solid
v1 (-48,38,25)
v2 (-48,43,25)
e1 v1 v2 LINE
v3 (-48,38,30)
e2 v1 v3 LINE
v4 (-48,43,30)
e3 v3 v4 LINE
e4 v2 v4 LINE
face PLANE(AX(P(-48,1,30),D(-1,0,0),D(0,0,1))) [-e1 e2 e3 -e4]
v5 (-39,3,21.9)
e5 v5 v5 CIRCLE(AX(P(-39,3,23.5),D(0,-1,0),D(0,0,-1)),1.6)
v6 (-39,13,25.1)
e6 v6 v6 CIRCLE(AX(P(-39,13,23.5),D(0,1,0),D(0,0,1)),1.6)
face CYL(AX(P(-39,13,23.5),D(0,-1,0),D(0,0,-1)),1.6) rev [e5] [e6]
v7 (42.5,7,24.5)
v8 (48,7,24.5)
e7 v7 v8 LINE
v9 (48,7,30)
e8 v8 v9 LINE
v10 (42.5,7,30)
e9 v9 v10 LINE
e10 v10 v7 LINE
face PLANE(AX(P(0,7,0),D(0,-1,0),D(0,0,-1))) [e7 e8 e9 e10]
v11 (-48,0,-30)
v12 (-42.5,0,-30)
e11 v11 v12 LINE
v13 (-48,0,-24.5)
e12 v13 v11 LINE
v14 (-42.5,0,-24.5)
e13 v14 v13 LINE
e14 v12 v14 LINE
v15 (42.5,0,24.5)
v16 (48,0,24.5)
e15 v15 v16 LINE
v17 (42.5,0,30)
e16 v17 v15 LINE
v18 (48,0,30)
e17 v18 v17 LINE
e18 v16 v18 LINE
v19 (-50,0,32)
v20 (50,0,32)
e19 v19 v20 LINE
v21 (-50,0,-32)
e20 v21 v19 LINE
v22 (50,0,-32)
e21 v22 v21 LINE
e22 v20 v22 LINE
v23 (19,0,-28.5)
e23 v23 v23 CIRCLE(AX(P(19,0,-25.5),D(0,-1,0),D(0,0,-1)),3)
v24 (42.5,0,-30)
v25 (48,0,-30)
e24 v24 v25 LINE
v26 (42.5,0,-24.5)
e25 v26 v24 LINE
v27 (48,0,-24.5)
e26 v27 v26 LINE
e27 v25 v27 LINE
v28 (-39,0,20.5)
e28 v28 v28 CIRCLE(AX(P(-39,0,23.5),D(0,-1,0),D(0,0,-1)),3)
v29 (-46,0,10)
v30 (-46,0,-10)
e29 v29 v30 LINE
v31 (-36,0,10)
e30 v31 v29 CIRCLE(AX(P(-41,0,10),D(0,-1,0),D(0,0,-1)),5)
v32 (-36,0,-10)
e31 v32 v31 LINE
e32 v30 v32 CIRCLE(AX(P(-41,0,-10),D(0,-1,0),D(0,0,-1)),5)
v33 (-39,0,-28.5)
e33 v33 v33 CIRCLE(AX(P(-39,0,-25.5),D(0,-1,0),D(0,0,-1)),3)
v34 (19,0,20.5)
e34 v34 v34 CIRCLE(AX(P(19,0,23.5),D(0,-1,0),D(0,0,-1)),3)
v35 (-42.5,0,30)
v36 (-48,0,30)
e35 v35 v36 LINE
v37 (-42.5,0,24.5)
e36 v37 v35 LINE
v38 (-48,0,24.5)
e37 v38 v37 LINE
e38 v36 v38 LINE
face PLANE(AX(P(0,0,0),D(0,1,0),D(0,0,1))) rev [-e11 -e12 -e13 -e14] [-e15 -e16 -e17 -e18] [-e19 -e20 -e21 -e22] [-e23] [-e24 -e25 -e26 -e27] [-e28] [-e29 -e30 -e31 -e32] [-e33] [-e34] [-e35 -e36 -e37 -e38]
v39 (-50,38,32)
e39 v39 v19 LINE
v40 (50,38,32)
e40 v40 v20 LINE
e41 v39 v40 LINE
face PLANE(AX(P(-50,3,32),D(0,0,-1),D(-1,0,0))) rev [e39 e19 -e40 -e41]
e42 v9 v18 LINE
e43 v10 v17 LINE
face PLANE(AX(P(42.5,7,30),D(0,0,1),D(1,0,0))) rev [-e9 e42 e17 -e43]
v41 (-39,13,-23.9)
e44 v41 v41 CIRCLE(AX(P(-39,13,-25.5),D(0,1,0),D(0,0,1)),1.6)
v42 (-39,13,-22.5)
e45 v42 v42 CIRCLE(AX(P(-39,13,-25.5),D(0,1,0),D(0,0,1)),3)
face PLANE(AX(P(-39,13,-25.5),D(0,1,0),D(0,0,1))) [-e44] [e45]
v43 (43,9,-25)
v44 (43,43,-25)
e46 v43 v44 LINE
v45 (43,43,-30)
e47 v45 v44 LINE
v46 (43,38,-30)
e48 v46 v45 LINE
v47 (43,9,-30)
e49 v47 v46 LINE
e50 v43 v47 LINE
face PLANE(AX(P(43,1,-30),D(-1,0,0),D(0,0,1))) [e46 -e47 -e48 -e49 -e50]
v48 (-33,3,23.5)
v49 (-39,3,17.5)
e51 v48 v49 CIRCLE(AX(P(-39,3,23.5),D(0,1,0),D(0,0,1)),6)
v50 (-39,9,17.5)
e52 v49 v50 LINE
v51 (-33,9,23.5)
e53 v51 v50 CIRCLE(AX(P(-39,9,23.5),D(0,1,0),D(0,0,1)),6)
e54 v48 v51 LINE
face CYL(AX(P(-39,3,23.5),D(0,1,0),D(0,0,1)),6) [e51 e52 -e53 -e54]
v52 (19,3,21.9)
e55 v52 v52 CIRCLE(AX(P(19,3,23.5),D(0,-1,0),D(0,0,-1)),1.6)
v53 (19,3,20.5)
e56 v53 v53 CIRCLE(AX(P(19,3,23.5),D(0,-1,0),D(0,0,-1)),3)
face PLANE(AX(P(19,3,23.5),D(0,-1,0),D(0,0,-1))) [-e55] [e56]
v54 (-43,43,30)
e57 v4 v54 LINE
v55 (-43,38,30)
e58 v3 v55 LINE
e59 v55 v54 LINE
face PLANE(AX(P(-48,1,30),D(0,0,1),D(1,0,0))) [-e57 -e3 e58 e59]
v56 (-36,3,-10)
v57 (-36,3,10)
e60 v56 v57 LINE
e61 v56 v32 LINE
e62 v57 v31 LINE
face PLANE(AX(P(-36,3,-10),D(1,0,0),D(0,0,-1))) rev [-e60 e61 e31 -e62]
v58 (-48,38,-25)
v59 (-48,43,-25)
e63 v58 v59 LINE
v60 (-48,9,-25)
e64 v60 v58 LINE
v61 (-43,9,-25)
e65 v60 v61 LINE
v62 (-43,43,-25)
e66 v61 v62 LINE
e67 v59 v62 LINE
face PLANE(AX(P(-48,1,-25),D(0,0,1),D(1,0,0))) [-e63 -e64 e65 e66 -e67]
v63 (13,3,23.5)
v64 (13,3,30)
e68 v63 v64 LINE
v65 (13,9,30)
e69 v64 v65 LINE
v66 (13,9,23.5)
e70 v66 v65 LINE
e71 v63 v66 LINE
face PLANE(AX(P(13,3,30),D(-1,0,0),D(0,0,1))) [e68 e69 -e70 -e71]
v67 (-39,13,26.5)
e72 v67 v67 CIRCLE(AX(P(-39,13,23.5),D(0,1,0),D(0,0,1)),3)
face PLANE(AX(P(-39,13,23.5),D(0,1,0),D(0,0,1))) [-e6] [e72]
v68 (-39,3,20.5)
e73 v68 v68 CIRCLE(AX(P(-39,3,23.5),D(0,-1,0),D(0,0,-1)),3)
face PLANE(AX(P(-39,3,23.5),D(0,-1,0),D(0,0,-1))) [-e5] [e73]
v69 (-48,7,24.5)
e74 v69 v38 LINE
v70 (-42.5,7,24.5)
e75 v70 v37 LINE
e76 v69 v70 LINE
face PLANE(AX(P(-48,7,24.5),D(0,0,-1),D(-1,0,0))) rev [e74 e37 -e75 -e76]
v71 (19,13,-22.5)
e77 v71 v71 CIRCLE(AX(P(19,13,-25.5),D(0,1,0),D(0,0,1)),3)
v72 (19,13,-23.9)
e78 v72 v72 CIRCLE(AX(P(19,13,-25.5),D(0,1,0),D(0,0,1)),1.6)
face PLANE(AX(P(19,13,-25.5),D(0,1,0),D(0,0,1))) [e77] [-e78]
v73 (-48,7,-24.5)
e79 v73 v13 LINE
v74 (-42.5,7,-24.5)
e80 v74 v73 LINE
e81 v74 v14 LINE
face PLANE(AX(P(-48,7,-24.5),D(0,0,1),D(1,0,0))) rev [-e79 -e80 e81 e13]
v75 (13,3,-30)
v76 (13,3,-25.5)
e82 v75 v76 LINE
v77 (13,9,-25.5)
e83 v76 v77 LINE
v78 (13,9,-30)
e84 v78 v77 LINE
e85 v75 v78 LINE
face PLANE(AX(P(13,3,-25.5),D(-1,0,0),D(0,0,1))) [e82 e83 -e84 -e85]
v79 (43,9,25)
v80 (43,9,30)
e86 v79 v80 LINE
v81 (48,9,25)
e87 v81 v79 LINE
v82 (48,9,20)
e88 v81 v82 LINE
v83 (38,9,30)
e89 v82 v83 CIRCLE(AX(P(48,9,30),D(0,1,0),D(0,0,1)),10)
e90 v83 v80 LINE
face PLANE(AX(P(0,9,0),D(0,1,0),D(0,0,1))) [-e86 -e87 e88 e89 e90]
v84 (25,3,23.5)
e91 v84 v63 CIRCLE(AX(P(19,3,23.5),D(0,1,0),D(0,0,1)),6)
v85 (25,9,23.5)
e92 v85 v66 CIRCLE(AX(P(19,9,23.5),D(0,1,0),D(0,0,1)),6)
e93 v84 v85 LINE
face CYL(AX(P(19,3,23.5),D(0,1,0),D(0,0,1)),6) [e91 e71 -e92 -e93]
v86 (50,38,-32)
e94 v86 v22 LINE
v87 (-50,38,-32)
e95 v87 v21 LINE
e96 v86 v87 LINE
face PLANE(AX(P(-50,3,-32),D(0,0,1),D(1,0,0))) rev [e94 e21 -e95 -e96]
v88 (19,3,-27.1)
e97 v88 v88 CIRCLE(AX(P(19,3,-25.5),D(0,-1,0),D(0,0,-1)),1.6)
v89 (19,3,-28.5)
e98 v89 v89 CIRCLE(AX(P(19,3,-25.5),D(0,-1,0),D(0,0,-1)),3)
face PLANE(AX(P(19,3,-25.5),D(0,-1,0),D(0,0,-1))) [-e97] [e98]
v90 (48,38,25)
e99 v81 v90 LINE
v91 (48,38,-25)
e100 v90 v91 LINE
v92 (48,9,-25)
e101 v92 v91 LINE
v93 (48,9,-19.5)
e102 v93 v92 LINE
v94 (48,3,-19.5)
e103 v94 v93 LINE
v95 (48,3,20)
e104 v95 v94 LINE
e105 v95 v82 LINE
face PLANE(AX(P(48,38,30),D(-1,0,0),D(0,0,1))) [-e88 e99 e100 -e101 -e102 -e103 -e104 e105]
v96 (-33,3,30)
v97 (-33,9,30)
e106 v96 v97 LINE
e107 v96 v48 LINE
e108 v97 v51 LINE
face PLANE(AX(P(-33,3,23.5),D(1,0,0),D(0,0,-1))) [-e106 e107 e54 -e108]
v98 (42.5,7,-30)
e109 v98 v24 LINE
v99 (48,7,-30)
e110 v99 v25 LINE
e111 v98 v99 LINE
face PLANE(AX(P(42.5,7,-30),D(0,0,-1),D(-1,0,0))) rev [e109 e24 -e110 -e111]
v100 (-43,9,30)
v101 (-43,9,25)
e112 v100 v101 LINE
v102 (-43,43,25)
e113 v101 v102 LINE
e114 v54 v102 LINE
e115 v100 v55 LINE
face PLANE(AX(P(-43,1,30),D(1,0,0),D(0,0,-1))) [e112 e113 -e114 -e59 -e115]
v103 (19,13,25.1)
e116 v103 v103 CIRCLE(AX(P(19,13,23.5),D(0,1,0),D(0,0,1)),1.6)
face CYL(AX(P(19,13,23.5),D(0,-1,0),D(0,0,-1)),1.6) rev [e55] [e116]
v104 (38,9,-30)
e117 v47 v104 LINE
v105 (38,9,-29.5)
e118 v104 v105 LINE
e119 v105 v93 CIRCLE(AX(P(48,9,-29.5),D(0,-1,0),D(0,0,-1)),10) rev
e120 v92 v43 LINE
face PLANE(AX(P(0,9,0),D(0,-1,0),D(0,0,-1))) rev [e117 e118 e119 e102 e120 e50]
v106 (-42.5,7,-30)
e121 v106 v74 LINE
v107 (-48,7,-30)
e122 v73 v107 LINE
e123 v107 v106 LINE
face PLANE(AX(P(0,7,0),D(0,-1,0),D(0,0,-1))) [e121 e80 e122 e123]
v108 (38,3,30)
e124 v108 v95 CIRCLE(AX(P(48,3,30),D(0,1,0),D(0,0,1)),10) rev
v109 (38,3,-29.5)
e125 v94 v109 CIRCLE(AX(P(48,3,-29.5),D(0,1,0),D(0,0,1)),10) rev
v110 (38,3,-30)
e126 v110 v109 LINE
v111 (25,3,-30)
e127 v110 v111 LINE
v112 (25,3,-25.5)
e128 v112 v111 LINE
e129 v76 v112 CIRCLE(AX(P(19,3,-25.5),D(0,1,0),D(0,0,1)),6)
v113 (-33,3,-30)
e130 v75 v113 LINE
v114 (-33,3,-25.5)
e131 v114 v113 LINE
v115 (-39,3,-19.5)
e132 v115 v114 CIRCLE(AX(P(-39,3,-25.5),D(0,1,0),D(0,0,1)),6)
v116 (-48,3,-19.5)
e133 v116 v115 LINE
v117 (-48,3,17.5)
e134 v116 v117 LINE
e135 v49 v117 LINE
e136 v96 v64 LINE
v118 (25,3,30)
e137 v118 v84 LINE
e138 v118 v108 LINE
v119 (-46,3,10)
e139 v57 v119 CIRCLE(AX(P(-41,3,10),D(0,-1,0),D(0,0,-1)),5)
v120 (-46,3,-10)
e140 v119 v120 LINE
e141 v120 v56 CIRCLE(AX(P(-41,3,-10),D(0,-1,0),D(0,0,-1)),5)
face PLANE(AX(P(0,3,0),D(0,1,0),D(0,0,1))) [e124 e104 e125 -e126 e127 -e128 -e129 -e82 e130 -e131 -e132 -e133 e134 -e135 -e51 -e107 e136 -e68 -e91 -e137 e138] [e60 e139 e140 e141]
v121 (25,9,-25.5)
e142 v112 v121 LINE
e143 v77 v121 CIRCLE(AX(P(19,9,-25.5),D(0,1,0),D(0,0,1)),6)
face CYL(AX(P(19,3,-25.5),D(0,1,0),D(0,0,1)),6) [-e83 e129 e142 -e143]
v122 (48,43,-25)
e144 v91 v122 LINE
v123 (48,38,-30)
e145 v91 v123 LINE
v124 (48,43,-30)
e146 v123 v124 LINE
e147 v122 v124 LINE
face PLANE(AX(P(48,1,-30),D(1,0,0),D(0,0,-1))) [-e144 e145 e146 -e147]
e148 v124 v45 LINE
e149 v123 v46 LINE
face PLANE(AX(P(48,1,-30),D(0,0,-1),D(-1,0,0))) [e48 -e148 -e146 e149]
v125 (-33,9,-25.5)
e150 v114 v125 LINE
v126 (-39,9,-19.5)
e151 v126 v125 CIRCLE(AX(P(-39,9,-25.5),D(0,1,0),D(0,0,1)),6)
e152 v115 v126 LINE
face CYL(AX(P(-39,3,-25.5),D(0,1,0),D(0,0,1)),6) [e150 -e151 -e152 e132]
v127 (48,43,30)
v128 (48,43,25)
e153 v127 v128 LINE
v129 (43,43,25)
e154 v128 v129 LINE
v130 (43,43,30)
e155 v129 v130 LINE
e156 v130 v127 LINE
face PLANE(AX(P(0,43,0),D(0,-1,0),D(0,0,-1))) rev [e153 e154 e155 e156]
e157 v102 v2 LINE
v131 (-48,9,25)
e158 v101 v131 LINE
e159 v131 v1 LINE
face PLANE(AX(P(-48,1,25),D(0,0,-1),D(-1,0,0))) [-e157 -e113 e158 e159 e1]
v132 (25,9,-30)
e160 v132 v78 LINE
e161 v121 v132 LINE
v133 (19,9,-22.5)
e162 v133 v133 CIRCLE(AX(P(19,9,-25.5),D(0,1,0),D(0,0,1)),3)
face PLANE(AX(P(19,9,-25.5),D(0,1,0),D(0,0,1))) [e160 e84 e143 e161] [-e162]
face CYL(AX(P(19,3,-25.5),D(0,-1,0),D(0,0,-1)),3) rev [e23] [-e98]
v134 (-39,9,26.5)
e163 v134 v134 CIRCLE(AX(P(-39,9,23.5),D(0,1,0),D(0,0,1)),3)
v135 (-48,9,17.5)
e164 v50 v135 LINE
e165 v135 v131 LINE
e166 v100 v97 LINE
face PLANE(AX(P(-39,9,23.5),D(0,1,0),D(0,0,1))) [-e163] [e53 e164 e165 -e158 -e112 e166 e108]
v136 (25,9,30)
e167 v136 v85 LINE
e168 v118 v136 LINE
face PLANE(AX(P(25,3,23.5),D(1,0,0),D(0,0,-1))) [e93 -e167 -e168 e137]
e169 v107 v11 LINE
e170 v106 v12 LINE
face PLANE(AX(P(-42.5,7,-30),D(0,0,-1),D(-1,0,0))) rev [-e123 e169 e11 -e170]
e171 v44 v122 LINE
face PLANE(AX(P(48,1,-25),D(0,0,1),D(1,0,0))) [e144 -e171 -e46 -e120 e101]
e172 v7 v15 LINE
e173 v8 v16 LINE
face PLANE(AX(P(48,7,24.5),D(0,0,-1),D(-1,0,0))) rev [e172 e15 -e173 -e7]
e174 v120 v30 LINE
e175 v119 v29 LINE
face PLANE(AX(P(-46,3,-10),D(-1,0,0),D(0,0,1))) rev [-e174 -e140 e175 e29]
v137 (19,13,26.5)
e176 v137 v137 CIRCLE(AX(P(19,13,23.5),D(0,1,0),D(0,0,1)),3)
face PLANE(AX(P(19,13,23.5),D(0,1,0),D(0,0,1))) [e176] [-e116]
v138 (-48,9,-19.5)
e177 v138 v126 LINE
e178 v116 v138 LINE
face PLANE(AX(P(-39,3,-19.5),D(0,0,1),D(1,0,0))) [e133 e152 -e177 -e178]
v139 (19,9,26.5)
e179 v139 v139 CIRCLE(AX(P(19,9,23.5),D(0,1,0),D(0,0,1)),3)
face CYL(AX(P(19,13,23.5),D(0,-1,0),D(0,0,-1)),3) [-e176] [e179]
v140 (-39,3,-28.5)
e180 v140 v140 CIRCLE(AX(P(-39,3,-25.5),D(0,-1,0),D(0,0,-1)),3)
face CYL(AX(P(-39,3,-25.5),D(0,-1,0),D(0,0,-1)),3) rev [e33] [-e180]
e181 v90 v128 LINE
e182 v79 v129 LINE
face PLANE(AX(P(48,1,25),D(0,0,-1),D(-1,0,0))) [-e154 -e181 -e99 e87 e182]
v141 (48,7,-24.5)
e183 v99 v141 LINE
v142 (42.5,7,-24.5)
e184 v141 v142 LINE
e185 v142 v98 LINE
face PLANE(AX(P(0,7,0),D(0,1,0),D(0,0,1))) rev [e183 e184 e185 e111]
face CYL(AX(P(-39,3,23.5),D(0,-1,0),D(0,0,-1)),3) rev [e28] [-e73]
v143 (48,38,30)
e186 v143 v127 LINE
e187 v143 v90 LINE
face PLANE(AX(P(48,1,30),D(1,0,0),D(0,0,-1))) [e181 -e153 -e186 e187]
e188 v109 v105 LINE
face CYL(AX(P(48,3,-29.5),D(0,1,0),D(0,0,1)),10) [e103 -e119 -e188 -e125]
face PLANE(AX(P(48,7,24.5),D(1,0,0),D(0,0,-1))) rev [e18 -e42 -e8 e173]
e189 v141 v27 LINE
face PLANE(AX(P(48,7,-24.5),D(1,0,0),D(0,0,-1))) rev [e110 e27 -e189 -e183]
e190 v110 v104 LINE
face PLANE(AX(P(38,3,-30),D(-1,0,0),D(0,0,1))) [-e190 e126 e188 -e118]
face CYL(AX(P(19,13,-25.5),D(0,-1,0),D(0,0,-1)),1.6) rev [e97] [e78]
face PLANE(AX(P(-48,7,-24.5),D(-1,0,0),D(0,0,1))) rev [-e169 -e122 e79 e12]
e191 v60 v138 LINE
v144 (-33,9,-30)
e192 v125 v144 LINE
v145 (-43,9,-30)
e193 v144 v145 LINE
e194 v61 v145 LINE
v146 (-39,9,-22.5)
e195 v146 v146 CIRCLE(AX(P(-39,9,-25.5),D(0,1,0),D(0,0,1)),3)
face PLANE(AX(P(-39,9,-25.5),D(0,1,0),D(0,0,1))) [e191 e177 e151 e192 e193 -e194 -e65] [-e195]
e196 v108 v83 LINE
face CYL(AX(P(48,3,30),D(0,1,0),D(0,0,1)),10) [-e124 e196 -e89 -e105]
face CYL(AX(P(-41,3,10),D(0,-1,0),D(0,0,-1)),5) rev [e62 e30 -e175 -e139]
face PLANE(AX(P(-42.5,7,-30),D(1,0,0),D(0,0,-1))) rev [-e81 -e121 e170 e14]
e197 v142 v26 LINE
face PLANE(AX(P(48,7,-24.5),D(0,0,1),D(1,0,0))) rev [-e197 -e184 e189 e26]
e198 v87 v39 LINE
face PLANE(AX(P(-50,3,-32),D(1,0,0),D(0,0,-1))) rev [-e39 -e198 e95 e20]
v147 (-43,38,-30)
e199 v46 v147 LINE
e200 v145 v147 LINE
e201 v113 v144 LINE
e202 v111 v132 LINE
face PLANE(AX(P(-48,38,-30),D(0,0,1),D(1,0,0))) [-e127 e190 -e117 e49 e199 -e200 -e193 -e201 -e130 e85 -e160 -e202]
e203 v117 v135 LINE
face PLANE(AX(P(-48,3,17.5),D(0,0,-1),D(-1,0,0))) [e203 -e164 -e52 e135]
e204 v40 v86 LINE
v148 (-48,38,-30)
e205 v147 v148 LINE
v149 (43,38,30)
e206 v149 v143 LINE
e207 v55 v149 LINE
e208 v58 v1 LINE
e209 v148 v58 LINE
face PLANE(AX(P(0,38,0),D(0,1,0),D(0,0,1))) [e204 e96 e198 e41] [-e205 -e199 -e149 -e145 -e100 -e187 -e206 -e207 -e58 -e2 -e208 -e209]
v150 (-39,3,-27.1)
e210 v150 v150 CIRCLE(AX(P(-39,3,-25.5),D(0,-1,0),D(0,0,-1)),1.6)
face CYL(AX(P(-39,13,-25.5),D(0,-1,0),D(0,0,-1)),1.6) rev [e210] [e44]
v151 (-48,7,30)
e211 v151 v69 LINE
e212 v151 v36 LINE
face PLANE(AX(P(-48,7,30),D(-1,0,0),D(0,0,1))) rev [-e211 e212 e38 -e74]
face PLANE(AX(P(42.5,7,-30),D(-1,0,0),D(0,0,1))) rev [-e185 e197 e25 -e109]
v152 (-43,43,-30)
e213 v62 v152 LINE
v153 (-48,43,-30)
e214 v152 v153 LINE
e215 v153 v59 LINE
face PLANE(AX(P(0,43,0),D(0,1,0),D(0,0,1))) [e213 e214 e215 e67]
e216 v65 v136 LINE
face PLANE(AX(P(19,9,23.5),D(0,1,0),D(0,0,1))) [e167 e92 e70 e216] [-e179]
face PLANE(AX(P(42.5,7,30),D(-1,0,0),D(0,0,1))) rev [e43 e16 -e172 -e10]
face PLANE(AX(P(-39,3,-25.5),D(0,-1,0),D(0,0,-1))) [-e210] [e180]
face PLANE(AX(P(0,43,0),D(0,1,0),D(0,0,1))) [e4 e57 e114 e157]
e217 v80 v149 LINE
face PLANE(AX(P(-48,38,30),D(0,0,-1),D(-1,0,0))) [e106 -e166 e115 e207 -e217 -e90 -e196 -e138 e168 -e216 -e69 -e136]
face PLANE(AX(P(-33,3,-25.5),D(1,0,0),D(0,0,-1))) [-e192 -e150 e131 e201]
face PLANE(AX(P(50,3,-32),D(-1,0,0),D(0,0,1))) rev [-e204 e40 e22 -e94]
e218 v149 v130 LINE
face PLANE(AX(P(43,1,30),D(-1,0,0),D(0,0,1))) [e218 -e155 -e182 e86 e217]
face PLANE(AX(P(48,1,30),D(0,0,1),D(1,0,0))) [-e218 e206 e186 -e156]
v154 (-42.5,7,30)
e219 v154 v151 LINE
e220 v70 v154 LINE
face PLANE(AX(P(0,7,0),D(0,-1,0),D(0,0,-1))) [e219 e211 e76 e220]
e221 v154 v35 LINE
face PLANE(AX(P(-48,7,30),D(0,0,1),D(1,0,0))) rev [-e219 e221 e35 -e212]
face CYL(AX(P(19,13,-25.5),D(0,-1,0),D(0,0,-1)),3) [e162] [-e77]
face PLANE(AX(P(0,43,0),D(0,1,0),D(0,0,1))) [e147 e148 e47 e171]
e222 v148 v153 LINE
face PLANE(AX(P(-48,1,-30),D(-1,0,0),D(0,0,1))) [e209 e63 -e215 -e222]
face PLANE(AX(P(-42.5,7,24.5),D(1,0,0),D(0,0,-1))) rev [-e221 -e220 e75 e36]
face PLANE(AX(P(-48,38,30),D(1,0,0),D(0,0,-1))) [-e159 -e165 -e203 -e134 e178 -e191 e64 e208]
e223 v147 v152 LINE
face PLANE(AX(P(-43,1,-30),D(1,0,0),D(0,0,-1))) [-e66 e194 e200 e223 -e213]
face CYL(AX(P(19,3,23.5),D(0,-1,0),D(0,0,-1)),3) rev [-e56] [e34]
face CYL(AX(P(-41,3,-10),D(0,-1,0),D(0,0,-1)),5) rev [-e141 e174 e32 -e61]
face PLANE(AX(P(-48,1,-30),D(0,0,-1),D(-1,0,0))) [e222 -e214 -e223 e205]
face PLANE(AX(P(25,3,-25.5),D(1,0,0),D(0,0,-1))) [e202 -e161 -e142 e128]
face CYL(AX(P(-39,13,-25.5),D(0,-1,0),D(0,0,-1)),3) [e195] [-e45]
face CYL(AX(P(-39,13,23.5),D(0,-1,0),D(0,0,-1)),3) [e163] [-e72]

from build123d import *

# Parameters (mm, degrees)
SKETCH1_W                = 100
SKETCH1_H                = 64
BOSS_EXTRUDE1_DEPTH      = 3
SKETCH2_W                = 100
SKETCH2_H                = 64
SKETCH2_W_2              = 96
SKETCH2_H_2              = 60
BOSS_EXTRUDE2_DEPTH      = 35
SKETCH6_R                = 3
SKETCH6_R_2              = 1.6
BOSS_EXTRUDE3_DEPTH      = 10
SKETCH7_R                = 1.5
CUT_EXTRUDE2_DEPTH       = 69.912988616
BOSS_EXTRUDE8_START      = -10
SKETCH10_R               = 3
SKETCH10_W               = 10
SKETCH10_H               = 10.5
SKETCH10_H_2             = 10
BOSS_EXTRUDE8_DEPTH      = 6
SKETCH11_R               = 3
CUT_EXTRUDE4_DEPTH       = 3
BOSS_EXTRUDE9_DEPTH      = 5
BOSS_EXTRUDE9_DEPTH_BACK = 37
SKETCH12_W               = 5
SKETCH12_H               = 5
SKETCH13_W               = 5.5
SKETCH13_H               = 5.5
CUT_EXTRUDE5_DEPTH       = 7
FILLET1_R                = 10


with BuildPart() as part:
    # Sketch1 → Boss-Extrude1 (new body)
    with BuildSketch(Plane(origin=(0, 0, 0), x_dir=(1, 0, 0), z_dir=(0, 1, 0))):
        Rectangle(SKETCH1_W, SKETCH1_H)
    extrude(amount=BOSS_EXTRUDE1_DEPTH)

    # Sketch2 → Boss-Extrude2 (add)
    with BuildSketch(Plane(origin=(0, 3, 0), x_dir=(1, 0, 0), z_dir=(0, 1, 0))):
        Rectangle(SKETCH2_W, SKETCH2_H)
        Rectangle(SKETCH2_W_2, SKETCH2_H_2, mode=Mode.SUBTRACT)
    extrude(amount=BOSS_EXTRUDE2_DEPTH)

    # Sketch6 → Boss-Extrude3 (add)
    # profile 1 of 4: a face of its own
    with BuildSketch(Plane(origin=(0, 3, 0), x_dir=(1, 0, 0), z_dir=(0, 1, 0))):
        with Locations(Location((-39, 25.5, 0), (0, 0, 270))):
            Circle(SKETCH6_R)
        with Locations(Location((-39, 25.5, 0), (0, 0, 270))):
            Circle(SKETCH6_R_2, mode=Mode.SUBTRACT)
    # profile 2 of 4: a face of its own
    with BuildSketch(Plane(origin=(0, 3, 0), x_dir=(1, 0, 0), z_dir=(0, 1, 0))):
        with Locations(Location((19, 25.5, 0), (0, 0, 270))):
            Circle(SKETCH6_R)
        with Locations(Location((19, 25.5, 0), (0, 0, 270))):
            Circle(SKETCH6_R_2, mode=Mode.SUBTRACT)
    # profile 3 of 4: a face of its own
    with BuildSketch(Plane(origin=(0, 3, 0), x_dir=(1, 0, 0), z_dir=(0, 1, 0))):
        with Locations(Location((-39, -23.5, 0), (0, 0, 270))):
            Circle(SKETCH6_R)
        with Locations(Location((-39, -23.5, 0), (0, 0, 270))):
            Circle(SKETCH6_R_2, mode=Mode.SUBTRACT)
    # profile 4 of 4: a face of its own
    with BuildSketch(Plane(origin=(0, 3, 0), x_dir=(1, 0, 0), z_dir=(0, 1, 0))):
        with Locations(Location((19, -23.5, 0), (0, 0, 270))):
            Circle(SKETCH6_R)
        with Locations(Location((19, -23.5, 0), (0, 0, 270))):
            Circle(SKETCH6_R_2, mode=Mode.SUBTRACT)
    extrude(amount=BOSS_EXTRUDE3_DEPTH)

    # Sketch7 → Cut-Extrude2 (cut, through all)
    with BuildSketch(Plane(origin=(0, 3, 0), x_dir=(1, 0, 0), z_dir=(0, 1, 0))):
        with Locations(Location((-39, 25.5, 0), (0, 0, 270))):
            Circle(SKETCH7_R)
        with Locations(Location((19, 25.5, 0), (0, 0, 270))):
            Circle(SKETCH7_R)
        with Locations(Location((19, -23.5, 0), (0, 0, 270))):
            Circle(SKETCH7_R)
        with Locations(Location((-39, -23.5, 0), (0, 0, 270))):
            Circle(SKETCH7_R)
    extrude(amount=-CUT_EXTRUDE2_DEPTH, mode=Mode.SUBTRACT)

    # Sketch10 → Boss-Extrude8 (add)
    # profile 1 of 6: a face of its own
    with BuildSketch(Plane(origin=(0, 13, 0), x_dir=(1, 0, 0), z_dir=(0, 1, 0)).offset(BOSS_EXTRUDE8_START)):
        with BuildLine():
            Line((-33, 25.5), (-33, 30))
            Line((-33, 30), (-48, 30))
            Line((-48, 30), (-48, 19.5))
            Line((-48, 19.5), (-39, 19.5))
            ThreePointArc((-39, 19.5), (-34.757359313, 21.257359313), (-33, 25.5))
        make_face()
        with Locations(Location((-39, 25.5, 0), (0, 0, 270))):
            Circle(SKETCH10_R, mode=Mode.SUBTRACT)
    # profile 2 of 6: a face of its own
    with BuildSketch(Plane(origin=(0, 13, 0), x_dir=(1, 0, 0), z_dir=(0, 1, 0)).offset(BOSS_EXTRUDE8_START)):
        with BuildLine():
            Line((25, 25.5), (25, 30))
            Line((25, 30), (13, 30))
            Line((13, 30), (13, 25.5))
            ThreePointArc((13, 25.5), (19, 19.5), (25, 25.5))
        make_face()
        with Locations(Location((19, 25.5, 0), (0, 0, 270))):
            Circle(SKETCH10_R, mode=Mode.SUBTRACT)
    # profile 3 of 6: a face of its own
    with BuildSketch(Plane(origin=(0, 13, 0), x_dir=(1, 0, 0), z_dir=(0, 1, 0)).offset(BOSS_EXTRUDE8_START)):
        with BuildLine():
            Line((25, -23.5), (25, -30))
            Line((25, -30), (13, -30))
            Line((13, -30), (13, -23.5))
            ThreePointArc((13, -23.5), (19, -17.5), (25, -23.5))
        make_face()
        with Locations(Location((19, -23.5, 0), (0, 0, 270))):
            Circle(SKETCH10_R, mode=Mode.SUBTRACT)
    # profile 4 of 6: a face of its own
    with BuildSketch(Plane(origin=(0, 13, 0), x_dir=(1, 0, 0), z_dir=(0, 1, 0)).offset(BOSS_EXTRUDE8_START)):
        with BuildLine():
            Line((-33, -23.5), (-33, -30))
            Line((-33, -30), (-48, -30))
            Line((-48, -30), (-48, -17.5))
            Line((-48, -17.5), (-39, -17.5))
            ThreePointArc((-39, -17.5), (-34.757359313, -19.257359313), (-33, -23.5))
        make_face()
        with Locations(Location((-39, -23.5, 0), (0, 0, 270))):
            Circle(SKETCH10_R, mode=Mode.SUBTRACT)
    # profile 5 of 6: a face of its own
    with BuildSketch(Plane(origin=(0, 13, 0), x_dir=(1, 0, 0), z_dir=(0, 1, 0)).offset(BOSS_EXTRUDE8_START)):
        with Locations((43, 24.75)):
            Rectangle(SKETCH10_W, SKETCH10_H)
    # profile 6 of 6: a face of its own
    with BuildSketch(Plane(origin=(0, 13, 0), x_dir=(1, 0, 0), z_dir=(0, 1, 0)).offset(BOSS_EXTRUDE8_START)):
        with Locations((43, -25)):
            Rectangle(SKETCH10_W, SKETCH10_H_2)
    extrude(amount=BOSS_EXTRUDE8_DEPTH)

    # Sketch11 → Cut-Extrude4 (cut)
    with BuildSketch(Plane.XZ):
        with Locations(Location((-39, 23.5, 0), (0, 0, 90))):
            Circle(SKETCH11_R)
        with Locations(Location((19, 23.5, 0), (0, 0, 90))):
            Circle(SKETCH11_R)
        with Locations(Location((19, -25.5, 0), (0, 0, 90))):
            Circle(SKETCH11_R)
        with Locations(Location((-39, -25.5, 0), (0, 0, 90))):
            Circle(SKETCH11_R)
        with BuildLine():
            Line((-46, -10), (-46, 10))
            ThreePointArc((-46, 10), (-41, 15), (-36, 10))
            Line((-36, 10), (-36, -10))
            ThreePointArc((-36, -10), (-41, -15), (-46, -10))
        make_face()
    extrude(amount=-CUT_EXTRUDE4_DEPTH, mode=Mode.SUBTRACT)

    # Sketch12 → Boss-Extrude9 (add, two sides: drawn at the far end of the back side and taken through both)
    with BuildSketch(Plane(origin=(0, 38, 0), x_dir=(1, 0, 0), z_dir=(0, 1, 0)).offset(-BOSS_EXTRUDE9_DEPTH_BACK)):
        with Locations((-45.5, 27.5)):
            Rectangle(SKETCH12_W, SKETCH12_H)
        with Locations((45.5, 27.5)):
            Rectangle(SKETCH12_W, SKETCH12_H)
        with Locations((45.5, -27.5)):
            Rectangle(SKETCH12_W, SKETCH12_H)
        with Locations((-45.5, -27.5)):
            Rectangle(SKETCH12_W, SKETCH12_H)
    extrude(amount=BOSS_EXTRUDE9_DEPTH + BOSS_EXTRUDE9_DEPTH_BACK)

    # Sketch13 → Cut-Extrude5 (cut)
    with BuildSketch(Plane.XZ):
        with Locations((-45.25, 27.25)):
            Rectangle(SKETCH13_W, SKETCH13_H)
        with Locations((-45.25, -27.25)):
            Rectangle(SKETCH13_W, SKETCH13_H)
        with Locations((45.25, -27.25)):
            Rectangle(SKETCH13_W, SKETCH13_H)
        with Locations((45.25, 27.25)):
            Rectangle(SKETCH13_W, SKETCH13_H)
    extrude(amount=-CUT_EXTRUDE5_DEPTH, mode=Mode.SUBTRACT)

    # Fillet1
    fillet1_edges = [part.edges().sort_by_distance(p)[0] for p in [
        (38, 6, 20),
        (38, 6, -19.5),
    ]]
    fillet(fillet1_edges, radius=FILLET1_R - 0.0001)  # a hair under: the kernel refuses the full size


solid = part.part
